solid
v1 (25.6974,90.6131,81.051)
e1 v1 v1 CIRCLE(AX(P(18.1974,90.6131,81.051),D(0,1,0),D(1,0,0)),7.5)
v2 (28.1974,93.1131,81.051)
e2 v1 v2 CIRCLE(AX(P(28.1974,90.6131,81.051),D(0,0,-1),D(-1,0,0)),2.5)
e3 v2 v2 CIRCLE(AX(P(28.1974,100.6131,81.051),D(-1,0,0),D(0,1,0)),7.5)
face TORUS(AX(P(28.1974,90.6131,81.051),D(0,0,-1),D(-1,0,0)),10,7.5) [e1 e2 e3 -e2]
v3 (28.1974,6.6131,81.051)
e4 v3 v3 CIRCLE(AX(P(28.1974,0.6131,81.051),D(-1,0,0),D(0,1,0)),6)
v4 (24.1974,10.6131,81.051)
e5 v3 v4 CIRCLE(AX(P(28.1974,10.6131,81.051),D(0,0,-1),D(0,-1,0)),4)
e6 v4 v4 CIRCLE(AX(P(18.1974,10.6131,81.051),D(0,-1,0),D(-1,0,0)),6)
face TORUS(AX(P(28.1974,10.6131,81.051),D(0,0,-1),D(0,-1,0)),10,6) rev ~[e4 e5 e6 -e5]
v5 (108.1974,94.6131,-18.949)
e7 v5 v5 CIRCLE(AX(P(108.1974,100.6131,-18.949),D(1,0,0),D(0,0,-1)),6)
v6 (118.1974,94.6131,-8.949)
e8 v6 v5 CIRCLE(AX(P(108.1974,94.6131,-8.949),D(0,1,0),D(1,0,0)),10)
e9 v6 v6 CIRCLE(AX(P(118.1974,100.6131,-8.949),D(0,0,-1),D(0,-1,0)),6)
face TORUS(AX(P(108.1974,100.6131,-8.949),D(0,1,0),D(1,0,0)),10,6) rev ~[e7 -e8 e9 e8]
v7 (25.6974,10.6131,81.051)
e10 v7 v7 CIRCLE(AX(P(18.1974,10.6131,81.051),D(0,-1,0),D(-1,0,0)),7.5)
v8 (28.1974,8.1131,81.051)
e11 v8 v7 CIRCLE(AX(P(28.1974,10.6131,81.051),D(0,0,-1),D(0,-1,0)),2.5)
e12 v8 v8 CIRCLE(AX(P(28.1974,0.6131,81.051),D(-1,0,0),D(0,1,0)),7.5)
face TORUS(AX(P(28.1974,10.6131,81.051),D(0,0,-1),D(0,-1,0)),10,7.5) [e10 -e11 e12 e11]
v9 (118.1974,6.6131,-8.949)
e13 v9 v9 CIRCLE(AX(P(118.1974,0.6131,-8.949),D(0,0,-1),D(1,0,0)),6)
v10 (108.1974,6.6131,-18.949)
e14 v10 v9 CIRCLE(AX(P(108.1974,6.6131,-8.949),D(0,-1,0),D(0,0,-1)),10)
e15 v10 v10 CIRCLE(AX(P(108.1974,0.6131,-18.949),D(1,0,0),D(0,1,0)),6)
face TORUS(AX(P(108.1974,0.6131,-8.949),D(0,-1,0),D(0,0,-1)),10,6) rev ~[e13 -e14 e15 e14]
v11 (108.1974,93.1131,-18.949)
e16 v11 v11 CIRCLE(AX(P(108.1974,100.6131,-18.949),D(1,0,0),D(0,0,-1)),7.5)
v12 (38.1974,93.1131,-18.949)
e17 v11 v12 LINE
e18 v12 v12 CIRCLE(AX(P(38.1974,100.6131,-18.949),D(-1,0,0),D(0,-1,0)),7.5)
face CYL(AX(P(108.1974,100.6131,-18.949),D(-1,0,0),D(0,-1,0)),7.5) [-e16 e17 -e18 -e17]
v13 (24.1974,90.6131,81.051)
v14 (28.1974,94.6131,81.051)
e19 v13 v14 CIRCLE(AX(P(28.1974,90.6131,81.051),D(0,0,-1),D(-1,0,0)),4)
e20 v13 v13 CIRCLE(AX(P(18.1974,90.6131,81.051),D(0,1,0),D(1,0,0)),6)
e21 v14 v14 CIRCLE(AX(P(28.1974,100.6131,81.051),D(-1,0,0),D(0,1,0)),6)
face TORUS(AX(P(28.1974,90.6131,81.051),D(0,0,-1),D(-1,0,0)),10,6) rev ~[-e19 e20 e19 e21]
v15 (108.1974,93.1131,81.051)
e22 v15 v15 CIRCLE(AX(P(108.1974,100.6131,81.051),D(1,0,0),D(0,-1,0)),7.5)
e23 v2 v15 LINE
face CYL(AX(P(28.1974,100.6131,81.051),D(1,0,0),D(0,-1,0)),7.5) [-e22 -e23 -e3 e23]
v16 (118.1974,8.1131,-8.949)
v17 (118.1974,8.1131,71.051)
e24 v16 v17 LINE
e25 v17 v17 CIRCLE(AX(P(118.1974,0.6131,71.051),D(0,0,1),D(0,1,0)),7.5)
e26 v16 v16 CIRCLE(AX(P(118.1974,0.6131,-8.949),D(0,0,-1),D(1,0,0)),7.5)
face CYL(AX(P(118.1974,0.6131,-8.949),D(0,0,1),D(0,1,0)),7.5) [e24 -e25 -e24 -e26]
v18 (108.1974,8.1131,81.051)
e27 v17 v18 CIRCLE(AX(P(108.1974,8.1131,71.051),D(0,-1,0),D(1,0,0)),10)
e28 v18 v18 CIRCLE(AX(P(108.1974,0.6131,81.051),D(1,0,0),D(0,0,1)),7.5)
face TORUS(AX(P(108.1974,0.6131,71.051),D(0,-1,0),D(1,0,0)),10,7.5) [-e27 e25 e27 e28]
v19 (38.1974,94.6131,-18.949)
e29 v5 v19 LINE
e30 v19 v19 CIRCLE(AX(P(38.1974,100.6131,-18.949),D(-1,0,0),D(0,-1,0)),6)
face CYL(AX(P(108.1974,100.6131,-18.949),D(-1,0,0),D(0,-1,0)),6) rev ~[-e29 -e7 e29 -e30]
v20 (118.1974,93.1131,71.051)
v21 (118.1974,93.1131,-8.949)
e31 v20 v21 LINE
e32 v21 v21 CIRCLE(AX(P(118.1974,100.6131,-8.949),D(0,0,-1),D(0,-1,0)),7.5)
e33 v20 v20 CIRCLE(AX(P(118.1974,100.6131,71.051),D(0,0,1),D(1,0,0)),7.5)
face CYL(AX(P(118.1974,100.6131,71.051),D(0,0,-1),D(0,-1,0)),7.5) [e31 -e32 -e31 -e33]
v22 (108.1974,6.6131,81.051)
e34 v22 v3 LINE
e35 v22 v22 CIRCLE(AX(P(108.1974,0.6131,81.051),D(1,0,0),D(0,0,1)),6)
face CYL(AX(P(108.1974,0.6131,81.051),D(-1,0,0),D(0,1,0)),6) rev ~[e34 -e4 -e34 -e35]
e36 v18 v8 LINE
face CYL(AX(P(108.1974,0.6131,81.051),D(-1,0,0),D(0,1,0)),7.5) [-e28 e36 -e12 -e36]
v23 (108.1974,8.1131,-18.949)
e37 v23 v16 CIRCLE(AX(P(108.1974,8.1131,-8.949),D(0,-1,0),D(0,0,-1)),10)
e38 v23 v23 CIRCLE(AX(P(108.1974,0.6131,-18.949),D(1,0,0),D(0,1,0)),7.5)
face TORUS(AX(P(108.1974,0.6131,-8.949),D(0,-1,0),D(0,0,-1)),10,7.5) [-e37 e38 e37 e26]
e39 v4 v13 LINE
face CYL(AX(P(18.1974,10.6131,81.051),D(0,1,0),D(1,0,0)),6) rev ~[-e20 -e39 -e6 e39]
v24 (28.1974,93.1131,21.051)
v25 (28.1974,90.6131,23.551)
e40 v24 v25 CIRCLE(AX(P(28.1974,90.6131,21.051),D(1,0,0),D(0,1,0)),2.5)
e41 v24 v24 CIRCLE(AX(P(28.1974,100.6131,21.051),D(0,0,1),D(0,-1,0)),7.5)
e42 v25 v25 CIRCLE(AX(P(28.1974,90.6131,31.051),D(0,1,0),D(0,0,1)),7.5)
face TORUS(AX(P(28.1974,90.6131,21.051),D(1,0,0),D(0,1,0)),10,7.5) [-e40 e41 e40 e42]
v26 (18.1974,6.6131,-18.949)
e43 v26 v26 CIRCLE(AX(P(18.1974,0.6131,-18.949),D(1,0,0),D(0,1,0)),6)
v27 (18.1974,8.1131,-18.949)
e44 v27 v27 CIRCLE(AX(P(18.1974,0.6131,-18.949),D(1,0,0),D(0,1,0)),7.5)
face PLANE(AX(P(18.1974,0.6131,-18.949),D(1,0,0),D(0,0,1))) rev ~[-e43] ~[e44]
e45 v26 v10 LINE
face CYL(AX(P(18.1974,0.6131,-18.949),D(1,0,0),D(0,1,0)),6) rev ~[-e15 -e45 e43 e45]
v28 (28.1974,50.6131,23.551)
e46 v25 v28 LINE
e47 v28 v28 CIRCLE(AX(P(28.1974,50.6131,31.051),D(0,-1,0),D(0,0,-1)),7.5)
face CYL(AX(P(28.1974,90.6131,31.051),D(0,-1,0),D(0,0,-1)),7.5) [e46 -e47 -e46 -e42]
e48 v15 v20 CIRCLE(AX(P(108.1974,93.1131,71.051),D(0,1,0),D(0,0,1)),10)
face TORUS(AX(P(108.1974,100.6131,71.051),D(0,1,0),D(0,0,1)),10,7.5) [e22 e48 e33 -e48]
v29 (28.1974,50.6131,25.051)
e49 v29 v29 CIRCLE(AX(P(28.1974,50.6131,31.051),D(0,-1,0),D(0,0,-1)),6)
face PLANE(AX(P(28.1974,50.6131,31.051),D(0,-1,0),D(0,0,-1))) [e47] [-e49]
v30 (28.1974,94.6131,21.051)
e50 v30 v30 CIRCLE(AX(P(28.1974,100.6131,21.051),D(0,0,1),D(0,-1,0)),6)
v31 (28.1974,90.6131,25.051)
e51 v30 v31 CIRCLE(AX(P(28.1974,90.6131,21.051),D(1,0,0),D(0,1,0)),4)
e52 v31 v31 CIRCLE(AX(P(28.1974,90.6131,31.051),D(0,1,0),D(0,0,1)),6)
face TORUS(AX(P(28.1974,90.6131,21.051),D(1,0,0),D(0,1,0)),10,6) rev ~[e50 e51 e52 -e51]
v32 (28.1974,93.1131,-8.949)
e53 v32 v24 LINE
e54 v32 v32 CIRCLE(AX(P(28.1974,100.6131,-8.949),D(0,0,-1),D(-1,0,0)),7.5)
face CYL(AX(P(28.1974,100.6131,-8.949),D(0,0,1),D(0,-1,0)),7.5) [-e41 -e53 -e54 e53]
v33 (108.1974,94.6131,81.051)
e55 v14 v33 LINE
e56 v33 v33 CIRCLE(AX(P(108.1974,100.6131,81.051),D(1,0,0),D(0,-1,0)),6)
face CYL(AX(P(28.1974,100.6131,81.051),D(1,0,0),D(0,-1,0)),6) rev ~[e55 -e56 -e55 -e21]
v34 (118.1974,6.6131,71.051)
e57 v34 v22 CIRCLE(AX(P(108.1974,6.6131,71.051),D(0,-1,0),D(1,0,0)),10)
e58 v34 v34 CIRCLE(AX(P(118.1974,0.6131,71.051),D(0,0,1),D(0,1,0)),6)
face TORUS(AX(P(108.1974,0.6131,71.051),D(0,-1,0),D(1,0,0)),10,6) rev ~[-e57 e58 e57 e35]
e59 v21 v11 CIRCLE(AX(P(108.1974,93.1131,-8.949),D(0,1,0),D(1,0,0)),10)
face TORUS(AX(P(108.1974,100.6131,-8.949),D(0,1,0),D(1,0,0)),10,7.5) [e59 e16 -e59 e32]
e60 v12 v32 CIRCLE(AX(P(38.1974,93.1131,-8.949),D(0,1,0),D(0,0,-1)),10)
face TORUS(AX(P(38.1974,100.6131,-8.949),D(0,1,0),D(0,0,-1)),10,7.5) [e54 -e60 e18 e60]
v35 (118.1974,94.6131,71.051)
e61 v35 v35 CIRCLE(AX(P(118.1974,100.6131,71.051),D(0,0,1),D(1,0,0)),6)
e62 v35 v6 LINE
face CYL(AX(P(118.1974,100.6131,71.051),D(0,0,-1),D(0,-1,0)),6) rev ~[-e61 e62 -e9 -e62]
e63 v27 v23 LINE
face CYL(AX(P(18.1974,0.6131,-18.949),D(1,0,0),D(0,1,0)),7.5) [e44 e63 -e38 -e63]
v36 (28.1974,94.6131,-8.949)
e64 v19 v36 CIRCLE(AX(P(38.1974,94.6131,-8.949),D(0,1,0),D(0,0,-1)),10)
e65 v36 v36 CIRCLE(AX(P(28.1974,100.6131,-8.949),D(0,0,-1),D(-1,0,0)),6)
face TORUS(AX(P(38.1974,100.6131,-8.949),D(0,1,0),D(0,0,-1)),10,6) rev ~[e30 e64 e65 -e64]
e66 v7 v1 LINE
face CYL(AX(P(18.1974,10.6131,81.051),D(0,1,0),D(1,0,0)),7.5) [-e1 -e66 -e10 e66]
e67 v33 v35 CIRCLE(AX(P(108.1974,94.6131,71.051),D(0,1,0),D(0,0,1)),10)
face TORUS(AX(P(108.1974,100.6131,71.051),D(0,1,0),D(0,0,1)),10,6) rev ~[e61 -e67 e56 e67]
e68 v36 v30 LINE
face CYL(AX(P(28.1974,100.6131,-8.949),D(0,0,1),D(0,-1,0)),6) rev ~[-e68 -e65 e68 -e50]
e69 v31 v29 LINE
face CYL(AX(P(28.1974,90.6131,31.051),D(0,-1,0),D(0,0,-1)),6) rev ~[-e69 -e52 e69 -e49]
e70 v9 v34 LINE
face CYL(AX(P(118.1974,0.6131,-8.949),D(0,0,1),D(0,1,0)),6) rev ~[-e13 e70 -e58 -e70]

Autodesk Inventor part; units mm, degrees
ref_plane "YZ Plane" through (0, 0, 0) normal (1, 0, 0) x (0, 1, 0)
sketch "Sketch1" plane through (0, 0, 0) normal (1, 0, 0) x (0, 1, 0)
  point P0 (0, 0)
ref_plane "Work Plane1" through (18.1974, 0.6131, -18.949) normal (0, 1, 0) x (-1, 0, 0)
sketch "Sketch2" plane through (18.1974, 0.6131, -18.949) normal (0, 1, 0) x (-1, 0, 0)
  point P0 (18.1974, 18.949)
ref_plane "Work Plane2" through (0, 0.6131, 0) normal (0, 1, 0) x (-1, 0, 0)
ref_plane "Work Plane3" through (18.1974, 0.6131, -18.949) normal (1, 0, 0) x (0, 1, 0)
sketch "Sketch3" plane through (18.1974, 0.6131, -18.949) normal (1, 0, 0) x (0, 1, 0)
  circle A0 centre (0, 0) radius 7.5
  point P0 (-0.6131, 18.949)
  dimension "d17" = 15
sketch3d "3D Sketch1"
  line L0 (18.1974, 0.6131, -18.949) -> (108.1974, 0.6131, -18.949)
  arc A0 (108.1974, 0.6131, -18.949) -> (118.1974, 0.6131, -8.949) centre (108.1974, 0.6131, -8.949) ccw
  line L1 (118.1974, 0.6131, -8.949) -> (118.1974, 0.6131, 71.051)
  arc A1 (118.1974, 0.6131, 71.051) -> (108.1974, 0.6131, 81.051) centre (108.1974, 0.6131, 71.051) ccw
  line L2 (108.1974, 0.6131, 81.051) -> (28.1974, 0.6131, 81.051)
  arc A2 (28.1974, 0.6131, 81.051) -> (18.1974, 10.6131, 81.051) centre (28.1974, 10.6131, 81.051) ccw
  line L3 (18.1974, 10.6131, 81.051) -> (18.1974, 90.6131, 81.051)
  arc A3 (18.1974, 90.6131, 81.051) -> (28.1974, 100.6131, 81.051) centre (28.1974, 90.6131, 81.051) ccw
  line L4 (28.1974, 100.6131, 81.051) -> (108.1974, 100.6131, 81.051)
  arc A4 (108.1974, 100.6131, 81.051) -> (118.1974, 100.6131, 71.051) centre (108.1974, 100.6131, 71.051) ccw
  line L5 (118.1974, 100.6131, 71.051) -> (118.1974, 100.6131, -8.949)
  arc A5 (118.1974, 100.6131, -8.949) -> (108.1974, 100.6131, -18.949) centre (108.1974, 100.6131, -8.949) ccw
  line L6 (108.1974, 100.6131, -18.949) -> (38.1974, 100.6131, -18.949)
  arc A6 (38.1974, 100.6131, -18.949) -> (28.1974, 100.6131, -8.949) centre (38.1974, 100.6131, -8.949) ccw
  line L7 (28.1974, 100.6131, -8.949) -> (28.1974, 100.6131, 21.051)
  arc A7 (28.1974, 100.6131, 21.051) -> (28.1974, 90.6131, 31.051) centre (28.1974, 90.6131, 21.051) ccw
  line L8 (28.1974, 90.6131, 31.051) -> (28.1974, 50.6131, 31.051)
  dimension "d0" = 100
  dimension "d1" = 100
  dimension "d2" = 100
  dimension "d3" = 100
  dimension "d4" = 100
  dimension "d5" = 50
  dimension "d6" = 50
  dimension "d7" = 90
  dimension "d8" = 100
  dimension "d9" = 10
  dimension "d10" = 10
  dimension "d11" = 10
  dimension "d12" = 10
  dimension "d13" = 10
  dimension "d14" = 10
  dimension "d15" = 10
  dimension "d16" = 10
sweep "Sweep1" add profiles "Sketch3" path "3D Sketch1"
shell "Shell1" thickness 1.5 removed faces 2 at (18.1974, 2.4843, -17.2912) at (28.7956, 50.6131, 29.7358)
equation "\"d10\" = d9"
equation "\"d11\" = d9"
equation "\"d12\" = d9"
equation "\"d13\" = d9"
equation "\"d14\" = d9"
equation "\"d15\" = d9"
equation "\"d16\" = d9"
properties part number "3D pipe"
